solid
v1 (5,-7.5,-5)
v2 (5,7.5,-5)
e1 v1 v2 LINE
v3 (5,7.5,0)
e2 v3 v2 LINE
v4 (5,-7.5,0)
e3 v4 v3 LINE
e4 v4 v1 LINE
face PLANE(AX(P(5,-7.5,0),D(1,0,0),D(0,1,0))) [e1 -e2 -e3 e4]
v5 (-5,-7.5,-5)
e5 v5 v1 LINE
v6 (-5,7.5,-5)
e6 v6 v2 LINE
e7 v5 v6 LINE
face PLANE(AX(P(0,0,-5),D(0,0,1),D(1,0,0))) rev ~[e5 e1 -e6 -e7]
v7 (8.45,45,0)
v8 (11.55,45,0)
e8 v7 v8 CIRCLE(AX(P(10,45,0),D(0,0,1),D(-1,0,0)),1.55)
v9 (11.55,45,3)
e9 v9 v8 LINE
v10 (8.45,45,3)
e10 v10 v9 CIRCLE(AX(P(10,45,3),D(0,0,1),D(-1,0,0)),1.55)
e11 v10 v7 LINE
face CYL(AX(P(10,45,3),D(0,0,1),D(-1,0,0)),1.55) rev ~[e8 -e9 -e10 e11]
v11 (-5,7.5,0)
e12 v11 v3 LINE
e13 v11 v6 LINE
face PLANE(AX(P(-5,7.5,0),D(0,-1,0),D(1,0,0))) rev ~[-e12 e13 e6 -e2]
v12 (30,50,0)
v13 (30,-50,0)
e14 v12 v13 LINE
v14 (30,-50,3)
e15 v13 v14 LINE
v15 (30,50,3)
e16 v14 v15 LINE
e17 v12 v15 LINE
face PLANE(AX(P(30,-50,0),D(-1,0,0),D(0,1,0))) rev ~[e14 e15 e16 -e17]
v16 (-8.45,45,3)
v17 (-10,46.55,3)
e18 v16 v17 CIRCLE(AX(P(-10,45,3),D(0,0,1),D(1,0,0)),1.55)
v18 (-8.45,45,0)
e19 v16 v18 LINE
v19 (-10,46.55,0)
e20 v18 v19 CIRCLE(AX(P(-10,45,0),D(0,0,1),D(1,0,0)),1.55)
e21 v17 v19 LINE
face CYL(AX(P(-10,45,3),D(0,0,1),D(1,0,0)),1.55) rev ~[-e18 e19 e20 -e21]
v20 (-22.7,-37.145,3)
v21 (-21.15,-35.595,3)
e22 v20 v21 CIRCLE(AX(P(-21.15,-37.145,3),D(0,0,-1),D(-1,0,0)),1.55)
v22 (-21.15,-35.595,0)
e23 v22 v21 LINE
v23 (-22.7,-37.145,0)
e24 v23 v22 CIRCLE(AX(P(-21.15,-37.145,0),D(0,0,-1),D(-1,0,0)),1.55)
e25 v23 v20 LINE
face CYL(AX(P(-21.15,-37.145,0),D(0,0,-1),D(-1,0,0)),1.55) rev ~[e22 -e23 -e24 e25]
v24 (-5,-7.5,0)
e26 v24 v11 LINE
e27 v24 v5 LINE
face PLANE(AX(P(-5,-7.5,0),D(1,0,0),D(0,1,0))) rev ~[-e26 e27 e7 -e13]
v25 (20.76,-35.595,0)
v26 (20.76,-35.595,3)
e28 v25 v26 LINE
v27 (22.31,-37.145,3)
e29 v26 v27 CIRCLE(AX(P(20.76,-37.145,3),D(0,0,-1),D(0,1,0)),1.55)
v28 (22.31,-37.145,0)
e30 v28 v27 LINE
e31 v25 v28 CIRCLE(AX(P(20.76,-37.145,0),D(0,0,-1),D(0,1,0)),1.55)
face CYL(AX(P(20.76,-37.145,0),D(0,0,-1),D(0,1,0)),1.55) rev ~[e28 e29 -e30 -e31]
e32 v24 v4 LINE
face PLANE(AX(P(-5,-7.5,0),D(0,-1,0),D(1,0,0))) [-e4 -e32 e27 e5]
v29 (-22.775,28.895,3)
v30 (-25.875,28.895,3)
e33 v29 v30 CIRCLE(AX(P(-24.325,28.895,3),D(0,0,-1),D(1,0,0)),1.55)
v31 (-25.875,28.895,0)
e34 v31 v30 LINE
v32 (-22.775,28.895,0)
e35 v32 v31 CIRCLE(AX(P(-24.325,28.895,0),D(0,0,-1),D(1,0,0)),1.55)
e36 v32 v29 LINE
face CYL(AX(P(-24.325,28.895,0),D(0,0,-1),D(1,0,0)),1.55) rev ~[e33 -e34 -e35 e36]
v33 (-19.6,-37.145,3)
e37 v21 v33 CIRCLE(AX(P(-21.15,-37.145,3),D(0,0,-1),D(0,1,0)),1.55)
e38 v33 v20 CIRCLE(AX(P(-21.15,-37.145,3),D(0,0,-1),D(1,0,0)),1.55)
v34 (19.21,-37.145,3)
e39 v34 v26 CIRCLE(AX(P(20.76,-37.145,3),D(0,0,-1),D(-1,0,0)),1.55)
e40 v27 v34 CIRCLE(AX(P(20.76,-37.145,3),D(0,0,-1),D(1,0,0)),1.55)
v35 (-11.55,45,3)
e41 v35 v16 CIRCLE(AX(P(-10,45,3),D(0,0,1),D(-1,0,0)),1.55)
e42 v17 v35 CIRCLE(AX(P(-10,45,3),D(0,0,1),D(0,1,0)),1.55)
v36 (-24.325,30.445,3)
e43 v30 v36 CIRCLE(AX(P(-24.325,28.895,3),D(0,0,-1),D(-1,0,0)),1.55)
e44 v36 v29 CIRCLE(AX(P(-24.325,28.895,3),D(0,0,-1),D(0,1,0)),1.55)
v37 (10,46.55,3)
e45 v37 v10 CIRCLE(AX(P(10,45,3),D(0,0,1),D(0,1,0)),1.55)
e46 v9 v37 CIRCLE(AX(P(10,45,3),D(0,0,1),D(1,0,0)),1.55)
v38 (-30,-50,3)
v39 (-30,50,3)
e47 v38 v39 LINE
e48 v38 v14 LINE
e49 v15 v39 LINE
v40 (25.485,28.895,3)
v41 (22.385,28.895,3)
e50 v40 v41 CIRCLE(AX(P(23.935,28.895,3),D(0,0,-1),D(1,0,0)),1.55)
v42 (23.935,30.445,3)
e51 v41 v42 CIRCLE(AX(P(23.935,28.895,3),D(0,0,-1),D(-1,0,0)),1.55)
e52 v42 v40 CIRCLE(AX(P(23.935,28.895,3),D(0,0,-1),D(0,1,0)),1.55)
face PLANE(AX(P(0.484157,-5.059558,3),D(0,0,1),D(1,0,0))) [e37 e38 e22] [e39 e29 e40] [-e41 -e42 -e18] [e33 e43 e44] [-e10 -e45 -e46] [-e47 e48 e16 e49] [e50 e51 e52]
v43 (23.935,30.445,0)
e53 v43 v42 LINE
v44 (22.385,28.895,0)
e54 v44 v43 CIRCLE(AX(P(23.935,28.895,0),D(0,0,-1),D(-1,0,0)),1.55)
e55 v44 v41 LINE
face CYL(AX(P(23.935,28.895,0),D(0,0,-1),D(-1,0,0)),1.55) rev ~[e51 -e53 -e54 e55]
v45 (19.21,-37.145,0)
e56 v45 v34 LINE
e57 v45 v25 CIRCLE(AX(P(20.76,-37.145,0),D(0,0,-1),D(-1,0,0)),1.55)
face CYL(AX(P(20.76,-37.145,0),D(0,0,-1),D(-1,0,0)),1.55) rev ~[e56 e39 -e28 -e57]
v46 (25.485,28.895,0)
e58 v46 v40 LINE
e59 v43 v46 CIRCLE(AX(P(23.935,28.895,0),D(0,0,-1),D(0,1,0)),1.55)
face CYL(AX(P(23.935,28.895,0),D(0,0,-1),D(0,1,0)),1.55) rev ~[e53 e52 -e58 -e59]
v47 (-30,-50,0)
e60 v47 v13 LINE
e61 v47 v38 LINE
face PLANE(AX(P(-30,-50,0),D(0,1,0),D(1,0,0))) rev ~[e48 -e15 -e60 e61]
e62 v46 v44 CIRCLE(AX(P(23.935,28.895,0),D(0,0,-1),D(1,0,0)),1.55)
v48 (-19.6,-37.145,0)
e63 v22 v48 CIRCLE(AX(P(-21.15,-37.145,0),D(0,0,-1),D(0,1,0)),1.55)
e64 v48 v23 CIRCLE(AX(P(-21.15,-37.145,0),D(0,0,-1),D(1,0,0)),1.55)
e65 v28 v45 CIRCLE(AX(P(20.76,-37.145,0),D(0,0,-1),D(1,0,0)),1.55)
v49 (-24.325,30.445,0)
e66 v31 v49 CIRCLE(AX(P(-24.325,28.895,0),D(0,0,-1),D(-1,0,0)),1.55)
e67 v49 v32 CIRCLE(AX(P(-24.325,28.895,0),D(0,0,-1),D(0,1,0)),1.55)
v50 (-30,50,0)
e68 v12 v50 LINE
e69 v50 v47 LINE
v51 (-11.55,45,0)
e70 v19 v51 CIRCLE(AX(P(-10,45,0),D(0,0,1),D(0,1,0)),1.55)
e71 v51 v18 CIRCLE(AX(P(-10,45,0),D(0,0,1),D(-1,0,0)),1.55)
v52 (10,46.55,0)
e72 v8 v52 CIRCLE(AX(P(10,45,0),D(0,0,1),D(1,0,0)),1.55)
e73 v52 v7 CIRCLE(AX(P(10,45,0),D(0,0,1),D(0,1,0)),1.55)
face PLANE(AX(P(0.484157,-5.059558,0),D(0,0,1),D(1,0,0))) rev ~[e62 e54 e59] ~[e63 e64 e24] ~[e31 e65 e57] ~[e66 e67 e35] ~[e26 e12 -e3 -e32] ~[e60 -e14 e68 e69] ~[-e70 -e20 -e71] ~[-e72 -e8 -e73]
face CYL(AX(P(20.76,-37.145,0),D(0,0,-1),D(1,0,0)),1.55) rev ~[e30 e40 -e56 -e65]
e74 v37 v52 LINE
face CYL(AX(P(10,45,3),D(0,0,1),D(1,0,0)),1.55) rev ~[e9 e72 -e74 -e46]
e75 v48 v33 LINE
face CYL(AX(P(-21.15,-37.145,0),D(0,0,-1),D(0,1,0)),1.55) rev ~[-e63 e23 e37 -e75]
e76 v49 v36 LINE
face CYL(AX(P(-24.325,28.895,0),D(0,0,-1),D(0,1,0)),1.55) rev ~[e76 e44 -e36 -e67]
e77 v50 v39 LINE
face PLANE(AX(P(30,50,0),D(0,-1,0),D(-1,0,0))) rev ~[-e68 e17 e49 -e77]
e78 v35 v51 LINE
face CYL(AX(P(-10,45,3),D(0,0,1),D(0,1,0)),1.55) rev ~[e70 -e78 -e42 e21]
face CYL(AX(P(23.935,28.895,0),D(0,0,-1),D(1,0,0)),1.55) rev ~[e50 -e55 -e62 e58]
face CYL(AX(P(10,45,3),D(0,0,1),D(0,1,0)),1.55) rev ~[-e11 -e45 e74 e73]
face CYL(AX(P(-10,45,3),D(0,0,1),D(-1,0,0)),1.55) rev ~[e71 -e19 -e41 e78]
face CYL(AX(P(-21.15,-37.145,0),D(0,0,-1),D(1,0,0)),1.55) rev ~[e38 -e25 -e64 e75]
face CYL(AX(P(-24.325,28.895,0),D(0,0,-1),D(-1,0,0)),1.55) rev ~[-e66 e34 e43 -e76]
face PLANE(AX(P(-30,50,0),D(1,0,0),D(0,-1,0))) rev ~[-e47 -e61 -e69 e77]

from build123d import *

# Parameters (mm, degrees)
F0_W     = 10
F0_H     = 15
F1_DEPTH = 5
F2_DEPTH = 3
F4_DEPTH = 3
F5_DEPTH = 25


with BuildPart() as f1:
    # F0 (on Top) → F1 (new body)
    with BuildSketch(Plane.XY):
        Rectangle(F0_W, F0_H)
    extrude(amount=-F1_DEPTH)

    # F0 (on Top) → F2 (join)
    with BuildSketch(Plane.XY):
        with BuildLine():
            Line((-30, -50), (30, -50))
            Line((30, -50), (30, 50))
            Line((30, 50), (15, 50))
            Line((15, 50), (15, 46.55))
            ThreePointArc((15, 46.55), (16.0960155108, 46.0960155108), (16.55, 45))
            ThreePointArc((16.55, 45), (16.2263348543, 44.0520533638), (15.3905124838, 43.5))
            Line((15.3905124838, 43.5), (20.76, 43.5))
            Line((20.76, 43.5), (23.935, 43.5))
            Line((23.935, 43.5), (27.5, 43.5))
            Line((27.5, 43.5), (27.5, -43.5))
            Line((27.5, -43.5), (-27.5, -43.5))
            Line((-27.5, -43.5), (-27.5, -37.145))
            Line((-27.5, -37.145), (-27.5, 28.895))
            Line((-27.5, 28.895), (-27.5, 43.5))
            Line((-27.5, 43.5), (-24.325, 43.5))
            Line((-24.325, 43.5), (-21.15, 43.5))
            Line((-21.15, 43.5), (-15.3905124838, 43.5))
            ThreePointArc((-15.3905124838, 43.5), (-16.2263348543, 44.0520533638), (-16.55, 45))
            Line((-16.55, 45), (-30, 45))
            Line((-30, 45), (-30, -50))
        make_face()
        with BuildLine():
            Line((-30, 50), (-30, 45))
            Line((-30, 45), (-16.55, 45))
            ThreePointArc((-16.55, 45), (-16.0960155108, 46.0960155108), (-15, 46.55))
            Line((-15, 46.55), (-15, 50))
            Line((-15, 50), (-30, 50))
        make_face()
        with BuildLine():
            Line((15, 46.55), (15, 50))
            Line((15, 50), (-15, 50))
            Line((-15, 50), (-15, 46.55))
            ThreePointArc((-15, 46.55), (-13.9039844892, 46.0960155108), (-13.45, 45))
            Line((-13.45, 45), (13.45, 45))
            ThreePointArc((13.45, 45), (13.9039844892, 46.0960155108), (15, 46.55))
        make_face()
        with BuildLine():
            ThreePointArc((-14.6094875162, 43.5), (-15, 43.45), (-15.3905124838, 43.5))
            Line((-15.3905124838, 43.5), (-21.15, 43.5))
            Line((-21.15, 43.5), (-21.15, 28.895))
            Line((-21.15, 28.895), (20.76, 28.895))
            Line((20.76, 28.895), (20.76, 43.5))
            Line((20.76, 43.5), (15.3905124838, 43.5))
            ThreePointArc((15.3905124838, 43.5), (15, 43.45), (14.6094875162, 43.5))
            Line((14.6094875162, 43.5), (-14.6094875162, 43.5))
        make_face()
        with BuildLine():
            ThreePointArc((14.6094875162, 43.5), (13.7736651457, 44.0520533638), (13.45, 45))
            Line((13.45, 45), (-13.45, 45))
            ThreePointArc((-13.45, 45), (-13.7736651457, 44.0520533638), (-14.6094875162, 43.5))
            Line((-14.6094875162, 43.5), (14.6094875162, 43.5))
        make_face()
        with BuildLine():
            Line((-21.15, 28.895), (-21.15, 43.5))
            Line((-21.15, 43.5), (-24.325, 43.5))
            Line((-24.325, 43.5), (-24.325, 30.445))
            ThreePointArc((-24.325, 30.445), (-23.2289844892, 29.9910155108), (-22.775, 28.895))
            Line((-22.775, 28.895), (-21.15, 28.895))
        make_face()
        with BuildLine():
            Line((-24.325, 30.445), (-24.325, 43.5))
            Line((-24.325, 43.5), (-27.5, 43.5))
            Line((-27.5, 43.5), (-27.5, 28.895))
            Line((-27.5, 28.895), (-25.875, 28.895))
            ThreePointArc((-25.875, 28.895), (-25.4210155108, 29.9910155108), (-24.325, 30.445))
        make_face()
        with BuildLine():
            Line((-21.15, -35.595), (-21.15, 28.895))
            Line((-21.15, 28.895), (-22.775, 28.895))
            ThreePointArc((-22.775, 28.895), (-24.325, 27.345), (-25.875, 28.895))
            Line((-25.875, 28.895), (-27.5, 28.895))
            Line((-27.5, 28.895), (-27.5, -37.145))
            Line((-27.5, -37.145), (-22.7, -37.145))
            ThreePointArc((-22.7, -37.145), (-22.2460155108, -36.0489844892), (-21.15, -35.595))
        make_face()
        with BuildLine():
            Line((20.76, 28.895), (-21.15, 28.895))
            Line((-21.15, 28.895), (-21.15, -35.595))
            ThreePointArc((-21.15, -35.595), (-20.0539844892, -36.0489844892), (-19.6, -37.145))
            Line((-19.6, -37.145), (19.21, -37.145))
            ThreePointArc((19.21, -37.145), (19.6639844892, -36.0489844892), (20.76, -35.595))
            Line((20.76, -35.595), (20.76, 28.895))
        make_face()
        Rectangle(F0_W, F0_H, mode=Mode.SUBTRACT)
        with BuildLine():
            Line((23.935, 43.5), (20.76, 43.5))
            Line((20.76, 43.5), (20.76, 28.895))
            Line((20.76, 28.895), (22.385, 28.895))
            ThreePointArc((22.385, 28.895), (22.8389844892, 29.9910155108), (23.935, 30.445))
            Line((23.935, 30.445), (23.935, 43.5))
        make_face()
        with BuildLine():
            Line((22.385, 28.895), (20.76, 28.895))
            Line((20.76, 28.895), (20.76, -35.595))
            ThreePointArc((20.76, -35.595), (21.8560155108, -36.0489844892), (22.31, -37.145))
            ThreePointArc((22.31, -37.145), (20.76, -38.695), (19.21, -37.145))
            Line((19.21, -37.145), (-19.6, -37.145))
            ThreePointArc((-19.6, -37.145), (-21.15, -38.695), (-22.7, -37.145))
            Line((-22.7, -37.145), (-27.5, -37.145))
            Line((-27.5, -37.145), (-27.5, -43.5))
            Line((-27.5, -43.5), (27.5, -43.5))
            Line((27.5, -43.5), (27.5, 43.5))
            Line((27.5, 43.5), (23.935, 43.5))
            Line((23.935, 43.5), (23.935, 30.445))
            ThreePointArc((23.935, 30.445), (25.0310155108, 29.9910155108), (25.485, 28.895))
            ThreePointArc((25.485, 28.895), (23.935, 27.345), (22.385, 28.895))
        make_face()
        Rectangle(F0_W, F0_H)
    extrude(amount=F2_DEPTH)

    # F3 (on face) → F4 (join)
    with BuildSketch(Plane.XY.offset(3)):
        with BuildLine():
            Line((10, 50), (-10, 50))
            Line((-10, 50), (-10, 46.55))
            ThreePointArc((-10, 46.55), (-8.9039844892, 46.0960155108), (-8.45, 45))
            Line((-8.45, 45), (8.45, 45))
            ThreePointArc((8.45, 45), (8.9039844892, 46.0960155108), (10, 46.55))
            Line((10, 46.55), (10, 50))
        make_face()
        with BuildLine():
            Line((30, 50), (10, 50))
            Line((10, 50), (10, 46.55))
            ThreePointArc((10, 46.55), (11.0960155108, 46.0960155108), (11.55, 45))
            Line((11.55, 45), (13.45, 45))
            ThreePointArc((13.45, 45), (15, 46.55), (16.55, 45))
            Line((16.55, 45), (30, 45))
            Line((30, 45), (30, 50))
        make_face()
        with BuildLine():
            Line((-16.55, 45), (-30, 45))
            Line((-30, 45), (-30, 40))
            Line((-30, 40), (30, 40))
            Line((30, 40), (30, 45))
            Line((30, 45), (16.55, 45))
            ThreePointArc((16.55, 45), (15, 43.45), (13.45, 45))
            Line((13.45, 45), (11.55, 45))
            ThreePointArc((11.55, 45), (10, 43.45), (8.45, 45))
            Line((8.45, 45), (-8.45, 45))
            ThreePointArc((-8.45, 45), (-10, 43.45), (-11.55, 45))
            Line((-11.55, 45), (-13.45, 45))
            ThreePointArc((-13.45, 45), (-15, 43.45), (-16.55, 45))
        make_face()
        with BuildLine():
            Line((-13.45, 45), (-16.55, 45))
            ThreePointArc((-16.55, 45), (-15, 43.45), (-13.45, 45))
        make_face()
        with BuildLine():
            ThreePointArc((-13.45, 45), (-15, 46.55), (-16.55, 45))
            Line((-16.55, 45), (-13.45, 45))
        make_face()
        with BuildLine():
            Line((-10, 50), (-30, 50))
            Line((-30, 50), (-30, 45))
            Line((-30, 45), (-16.55, 45))
            ThreePointArc((-16.55, 45), (-15, 46.55), (-13.45, 45))
            Line((-13.45, 45), (-11.55, 45))
            ThreePointArc((-11.55, 45), (-11.0960155108, 46.0960155108), (-10, 46.55))
            Line((-10, 46.55), (-10, 50))
        make_face()
        with BuildLine():
            Line((13.45, 45), (16.55, 45))
            ThreePointArc((16.55, 45), (15, 46.55), (13.45, 45))
        make_face()
        with BuildLine():
            ThreePointArc((13.45, 45), (15, 43.45), (16.55, 45))
            Line((16.55, 45), (13.45, 45))
        make_face()
    extrude(amount=-F4_DEPTH)

    # F3 (on face) → F5 (cut)
    with BuildSketch(Plane.XY.offset(3)):
        with BuildLine():
            Line((-8.45, 45), (-10, 45))
            Line((-10, 45), (-11.55, 45))
            ThreePointArc((-11.55, 45), (-10, 43.45), (-8.45, 45))
        make_face()
        with BuildLine():
            ThreePointArc((-8.45, 45), (-8.9039844892, 46.0960155108), (-10, 46.55))
            Line((-10, 46.55), (-10, 45))
            Line((-10, 45), (-8.45, 45))
        make_face()
        with BuildLine():
            Line((-10, 45), (-10, 46.55))
            ThreePointArc((-10, 46.55), (-11.0960155108, 46.0960155108), (-11.55, 45))
            Line((-11.55, 45), (-10, 45))
        make_face()
        with BuildLine():
            ThreePointArc((11.55, 45), (11.0960155108, 46.0960155108), (10, 46.55))
            Line((10, 46.55), (10, 45))
            Line((10, 45), (11.55, 45))
        make_face()
        with BuildLine():
            Line((10, 45), (10, 46.55))
            ThreePointArc((10, 46.55), (8.9039844892, 46.0960155108), (8.45, 45))
            Line((8.45, 45), (10, 45))
        make_face()
        with BuildLine():
            Line((11.55, 45), (10, 45))
            Line((10, 45), (8.45, 45))
            ThreePointArc((8.45, 45), (10, 43.45), (11.55, 45))
        make_face()
    extrude(amount=-F5_DEPTH, mode=Mode.SUBTRACT)


solid = f1.part
